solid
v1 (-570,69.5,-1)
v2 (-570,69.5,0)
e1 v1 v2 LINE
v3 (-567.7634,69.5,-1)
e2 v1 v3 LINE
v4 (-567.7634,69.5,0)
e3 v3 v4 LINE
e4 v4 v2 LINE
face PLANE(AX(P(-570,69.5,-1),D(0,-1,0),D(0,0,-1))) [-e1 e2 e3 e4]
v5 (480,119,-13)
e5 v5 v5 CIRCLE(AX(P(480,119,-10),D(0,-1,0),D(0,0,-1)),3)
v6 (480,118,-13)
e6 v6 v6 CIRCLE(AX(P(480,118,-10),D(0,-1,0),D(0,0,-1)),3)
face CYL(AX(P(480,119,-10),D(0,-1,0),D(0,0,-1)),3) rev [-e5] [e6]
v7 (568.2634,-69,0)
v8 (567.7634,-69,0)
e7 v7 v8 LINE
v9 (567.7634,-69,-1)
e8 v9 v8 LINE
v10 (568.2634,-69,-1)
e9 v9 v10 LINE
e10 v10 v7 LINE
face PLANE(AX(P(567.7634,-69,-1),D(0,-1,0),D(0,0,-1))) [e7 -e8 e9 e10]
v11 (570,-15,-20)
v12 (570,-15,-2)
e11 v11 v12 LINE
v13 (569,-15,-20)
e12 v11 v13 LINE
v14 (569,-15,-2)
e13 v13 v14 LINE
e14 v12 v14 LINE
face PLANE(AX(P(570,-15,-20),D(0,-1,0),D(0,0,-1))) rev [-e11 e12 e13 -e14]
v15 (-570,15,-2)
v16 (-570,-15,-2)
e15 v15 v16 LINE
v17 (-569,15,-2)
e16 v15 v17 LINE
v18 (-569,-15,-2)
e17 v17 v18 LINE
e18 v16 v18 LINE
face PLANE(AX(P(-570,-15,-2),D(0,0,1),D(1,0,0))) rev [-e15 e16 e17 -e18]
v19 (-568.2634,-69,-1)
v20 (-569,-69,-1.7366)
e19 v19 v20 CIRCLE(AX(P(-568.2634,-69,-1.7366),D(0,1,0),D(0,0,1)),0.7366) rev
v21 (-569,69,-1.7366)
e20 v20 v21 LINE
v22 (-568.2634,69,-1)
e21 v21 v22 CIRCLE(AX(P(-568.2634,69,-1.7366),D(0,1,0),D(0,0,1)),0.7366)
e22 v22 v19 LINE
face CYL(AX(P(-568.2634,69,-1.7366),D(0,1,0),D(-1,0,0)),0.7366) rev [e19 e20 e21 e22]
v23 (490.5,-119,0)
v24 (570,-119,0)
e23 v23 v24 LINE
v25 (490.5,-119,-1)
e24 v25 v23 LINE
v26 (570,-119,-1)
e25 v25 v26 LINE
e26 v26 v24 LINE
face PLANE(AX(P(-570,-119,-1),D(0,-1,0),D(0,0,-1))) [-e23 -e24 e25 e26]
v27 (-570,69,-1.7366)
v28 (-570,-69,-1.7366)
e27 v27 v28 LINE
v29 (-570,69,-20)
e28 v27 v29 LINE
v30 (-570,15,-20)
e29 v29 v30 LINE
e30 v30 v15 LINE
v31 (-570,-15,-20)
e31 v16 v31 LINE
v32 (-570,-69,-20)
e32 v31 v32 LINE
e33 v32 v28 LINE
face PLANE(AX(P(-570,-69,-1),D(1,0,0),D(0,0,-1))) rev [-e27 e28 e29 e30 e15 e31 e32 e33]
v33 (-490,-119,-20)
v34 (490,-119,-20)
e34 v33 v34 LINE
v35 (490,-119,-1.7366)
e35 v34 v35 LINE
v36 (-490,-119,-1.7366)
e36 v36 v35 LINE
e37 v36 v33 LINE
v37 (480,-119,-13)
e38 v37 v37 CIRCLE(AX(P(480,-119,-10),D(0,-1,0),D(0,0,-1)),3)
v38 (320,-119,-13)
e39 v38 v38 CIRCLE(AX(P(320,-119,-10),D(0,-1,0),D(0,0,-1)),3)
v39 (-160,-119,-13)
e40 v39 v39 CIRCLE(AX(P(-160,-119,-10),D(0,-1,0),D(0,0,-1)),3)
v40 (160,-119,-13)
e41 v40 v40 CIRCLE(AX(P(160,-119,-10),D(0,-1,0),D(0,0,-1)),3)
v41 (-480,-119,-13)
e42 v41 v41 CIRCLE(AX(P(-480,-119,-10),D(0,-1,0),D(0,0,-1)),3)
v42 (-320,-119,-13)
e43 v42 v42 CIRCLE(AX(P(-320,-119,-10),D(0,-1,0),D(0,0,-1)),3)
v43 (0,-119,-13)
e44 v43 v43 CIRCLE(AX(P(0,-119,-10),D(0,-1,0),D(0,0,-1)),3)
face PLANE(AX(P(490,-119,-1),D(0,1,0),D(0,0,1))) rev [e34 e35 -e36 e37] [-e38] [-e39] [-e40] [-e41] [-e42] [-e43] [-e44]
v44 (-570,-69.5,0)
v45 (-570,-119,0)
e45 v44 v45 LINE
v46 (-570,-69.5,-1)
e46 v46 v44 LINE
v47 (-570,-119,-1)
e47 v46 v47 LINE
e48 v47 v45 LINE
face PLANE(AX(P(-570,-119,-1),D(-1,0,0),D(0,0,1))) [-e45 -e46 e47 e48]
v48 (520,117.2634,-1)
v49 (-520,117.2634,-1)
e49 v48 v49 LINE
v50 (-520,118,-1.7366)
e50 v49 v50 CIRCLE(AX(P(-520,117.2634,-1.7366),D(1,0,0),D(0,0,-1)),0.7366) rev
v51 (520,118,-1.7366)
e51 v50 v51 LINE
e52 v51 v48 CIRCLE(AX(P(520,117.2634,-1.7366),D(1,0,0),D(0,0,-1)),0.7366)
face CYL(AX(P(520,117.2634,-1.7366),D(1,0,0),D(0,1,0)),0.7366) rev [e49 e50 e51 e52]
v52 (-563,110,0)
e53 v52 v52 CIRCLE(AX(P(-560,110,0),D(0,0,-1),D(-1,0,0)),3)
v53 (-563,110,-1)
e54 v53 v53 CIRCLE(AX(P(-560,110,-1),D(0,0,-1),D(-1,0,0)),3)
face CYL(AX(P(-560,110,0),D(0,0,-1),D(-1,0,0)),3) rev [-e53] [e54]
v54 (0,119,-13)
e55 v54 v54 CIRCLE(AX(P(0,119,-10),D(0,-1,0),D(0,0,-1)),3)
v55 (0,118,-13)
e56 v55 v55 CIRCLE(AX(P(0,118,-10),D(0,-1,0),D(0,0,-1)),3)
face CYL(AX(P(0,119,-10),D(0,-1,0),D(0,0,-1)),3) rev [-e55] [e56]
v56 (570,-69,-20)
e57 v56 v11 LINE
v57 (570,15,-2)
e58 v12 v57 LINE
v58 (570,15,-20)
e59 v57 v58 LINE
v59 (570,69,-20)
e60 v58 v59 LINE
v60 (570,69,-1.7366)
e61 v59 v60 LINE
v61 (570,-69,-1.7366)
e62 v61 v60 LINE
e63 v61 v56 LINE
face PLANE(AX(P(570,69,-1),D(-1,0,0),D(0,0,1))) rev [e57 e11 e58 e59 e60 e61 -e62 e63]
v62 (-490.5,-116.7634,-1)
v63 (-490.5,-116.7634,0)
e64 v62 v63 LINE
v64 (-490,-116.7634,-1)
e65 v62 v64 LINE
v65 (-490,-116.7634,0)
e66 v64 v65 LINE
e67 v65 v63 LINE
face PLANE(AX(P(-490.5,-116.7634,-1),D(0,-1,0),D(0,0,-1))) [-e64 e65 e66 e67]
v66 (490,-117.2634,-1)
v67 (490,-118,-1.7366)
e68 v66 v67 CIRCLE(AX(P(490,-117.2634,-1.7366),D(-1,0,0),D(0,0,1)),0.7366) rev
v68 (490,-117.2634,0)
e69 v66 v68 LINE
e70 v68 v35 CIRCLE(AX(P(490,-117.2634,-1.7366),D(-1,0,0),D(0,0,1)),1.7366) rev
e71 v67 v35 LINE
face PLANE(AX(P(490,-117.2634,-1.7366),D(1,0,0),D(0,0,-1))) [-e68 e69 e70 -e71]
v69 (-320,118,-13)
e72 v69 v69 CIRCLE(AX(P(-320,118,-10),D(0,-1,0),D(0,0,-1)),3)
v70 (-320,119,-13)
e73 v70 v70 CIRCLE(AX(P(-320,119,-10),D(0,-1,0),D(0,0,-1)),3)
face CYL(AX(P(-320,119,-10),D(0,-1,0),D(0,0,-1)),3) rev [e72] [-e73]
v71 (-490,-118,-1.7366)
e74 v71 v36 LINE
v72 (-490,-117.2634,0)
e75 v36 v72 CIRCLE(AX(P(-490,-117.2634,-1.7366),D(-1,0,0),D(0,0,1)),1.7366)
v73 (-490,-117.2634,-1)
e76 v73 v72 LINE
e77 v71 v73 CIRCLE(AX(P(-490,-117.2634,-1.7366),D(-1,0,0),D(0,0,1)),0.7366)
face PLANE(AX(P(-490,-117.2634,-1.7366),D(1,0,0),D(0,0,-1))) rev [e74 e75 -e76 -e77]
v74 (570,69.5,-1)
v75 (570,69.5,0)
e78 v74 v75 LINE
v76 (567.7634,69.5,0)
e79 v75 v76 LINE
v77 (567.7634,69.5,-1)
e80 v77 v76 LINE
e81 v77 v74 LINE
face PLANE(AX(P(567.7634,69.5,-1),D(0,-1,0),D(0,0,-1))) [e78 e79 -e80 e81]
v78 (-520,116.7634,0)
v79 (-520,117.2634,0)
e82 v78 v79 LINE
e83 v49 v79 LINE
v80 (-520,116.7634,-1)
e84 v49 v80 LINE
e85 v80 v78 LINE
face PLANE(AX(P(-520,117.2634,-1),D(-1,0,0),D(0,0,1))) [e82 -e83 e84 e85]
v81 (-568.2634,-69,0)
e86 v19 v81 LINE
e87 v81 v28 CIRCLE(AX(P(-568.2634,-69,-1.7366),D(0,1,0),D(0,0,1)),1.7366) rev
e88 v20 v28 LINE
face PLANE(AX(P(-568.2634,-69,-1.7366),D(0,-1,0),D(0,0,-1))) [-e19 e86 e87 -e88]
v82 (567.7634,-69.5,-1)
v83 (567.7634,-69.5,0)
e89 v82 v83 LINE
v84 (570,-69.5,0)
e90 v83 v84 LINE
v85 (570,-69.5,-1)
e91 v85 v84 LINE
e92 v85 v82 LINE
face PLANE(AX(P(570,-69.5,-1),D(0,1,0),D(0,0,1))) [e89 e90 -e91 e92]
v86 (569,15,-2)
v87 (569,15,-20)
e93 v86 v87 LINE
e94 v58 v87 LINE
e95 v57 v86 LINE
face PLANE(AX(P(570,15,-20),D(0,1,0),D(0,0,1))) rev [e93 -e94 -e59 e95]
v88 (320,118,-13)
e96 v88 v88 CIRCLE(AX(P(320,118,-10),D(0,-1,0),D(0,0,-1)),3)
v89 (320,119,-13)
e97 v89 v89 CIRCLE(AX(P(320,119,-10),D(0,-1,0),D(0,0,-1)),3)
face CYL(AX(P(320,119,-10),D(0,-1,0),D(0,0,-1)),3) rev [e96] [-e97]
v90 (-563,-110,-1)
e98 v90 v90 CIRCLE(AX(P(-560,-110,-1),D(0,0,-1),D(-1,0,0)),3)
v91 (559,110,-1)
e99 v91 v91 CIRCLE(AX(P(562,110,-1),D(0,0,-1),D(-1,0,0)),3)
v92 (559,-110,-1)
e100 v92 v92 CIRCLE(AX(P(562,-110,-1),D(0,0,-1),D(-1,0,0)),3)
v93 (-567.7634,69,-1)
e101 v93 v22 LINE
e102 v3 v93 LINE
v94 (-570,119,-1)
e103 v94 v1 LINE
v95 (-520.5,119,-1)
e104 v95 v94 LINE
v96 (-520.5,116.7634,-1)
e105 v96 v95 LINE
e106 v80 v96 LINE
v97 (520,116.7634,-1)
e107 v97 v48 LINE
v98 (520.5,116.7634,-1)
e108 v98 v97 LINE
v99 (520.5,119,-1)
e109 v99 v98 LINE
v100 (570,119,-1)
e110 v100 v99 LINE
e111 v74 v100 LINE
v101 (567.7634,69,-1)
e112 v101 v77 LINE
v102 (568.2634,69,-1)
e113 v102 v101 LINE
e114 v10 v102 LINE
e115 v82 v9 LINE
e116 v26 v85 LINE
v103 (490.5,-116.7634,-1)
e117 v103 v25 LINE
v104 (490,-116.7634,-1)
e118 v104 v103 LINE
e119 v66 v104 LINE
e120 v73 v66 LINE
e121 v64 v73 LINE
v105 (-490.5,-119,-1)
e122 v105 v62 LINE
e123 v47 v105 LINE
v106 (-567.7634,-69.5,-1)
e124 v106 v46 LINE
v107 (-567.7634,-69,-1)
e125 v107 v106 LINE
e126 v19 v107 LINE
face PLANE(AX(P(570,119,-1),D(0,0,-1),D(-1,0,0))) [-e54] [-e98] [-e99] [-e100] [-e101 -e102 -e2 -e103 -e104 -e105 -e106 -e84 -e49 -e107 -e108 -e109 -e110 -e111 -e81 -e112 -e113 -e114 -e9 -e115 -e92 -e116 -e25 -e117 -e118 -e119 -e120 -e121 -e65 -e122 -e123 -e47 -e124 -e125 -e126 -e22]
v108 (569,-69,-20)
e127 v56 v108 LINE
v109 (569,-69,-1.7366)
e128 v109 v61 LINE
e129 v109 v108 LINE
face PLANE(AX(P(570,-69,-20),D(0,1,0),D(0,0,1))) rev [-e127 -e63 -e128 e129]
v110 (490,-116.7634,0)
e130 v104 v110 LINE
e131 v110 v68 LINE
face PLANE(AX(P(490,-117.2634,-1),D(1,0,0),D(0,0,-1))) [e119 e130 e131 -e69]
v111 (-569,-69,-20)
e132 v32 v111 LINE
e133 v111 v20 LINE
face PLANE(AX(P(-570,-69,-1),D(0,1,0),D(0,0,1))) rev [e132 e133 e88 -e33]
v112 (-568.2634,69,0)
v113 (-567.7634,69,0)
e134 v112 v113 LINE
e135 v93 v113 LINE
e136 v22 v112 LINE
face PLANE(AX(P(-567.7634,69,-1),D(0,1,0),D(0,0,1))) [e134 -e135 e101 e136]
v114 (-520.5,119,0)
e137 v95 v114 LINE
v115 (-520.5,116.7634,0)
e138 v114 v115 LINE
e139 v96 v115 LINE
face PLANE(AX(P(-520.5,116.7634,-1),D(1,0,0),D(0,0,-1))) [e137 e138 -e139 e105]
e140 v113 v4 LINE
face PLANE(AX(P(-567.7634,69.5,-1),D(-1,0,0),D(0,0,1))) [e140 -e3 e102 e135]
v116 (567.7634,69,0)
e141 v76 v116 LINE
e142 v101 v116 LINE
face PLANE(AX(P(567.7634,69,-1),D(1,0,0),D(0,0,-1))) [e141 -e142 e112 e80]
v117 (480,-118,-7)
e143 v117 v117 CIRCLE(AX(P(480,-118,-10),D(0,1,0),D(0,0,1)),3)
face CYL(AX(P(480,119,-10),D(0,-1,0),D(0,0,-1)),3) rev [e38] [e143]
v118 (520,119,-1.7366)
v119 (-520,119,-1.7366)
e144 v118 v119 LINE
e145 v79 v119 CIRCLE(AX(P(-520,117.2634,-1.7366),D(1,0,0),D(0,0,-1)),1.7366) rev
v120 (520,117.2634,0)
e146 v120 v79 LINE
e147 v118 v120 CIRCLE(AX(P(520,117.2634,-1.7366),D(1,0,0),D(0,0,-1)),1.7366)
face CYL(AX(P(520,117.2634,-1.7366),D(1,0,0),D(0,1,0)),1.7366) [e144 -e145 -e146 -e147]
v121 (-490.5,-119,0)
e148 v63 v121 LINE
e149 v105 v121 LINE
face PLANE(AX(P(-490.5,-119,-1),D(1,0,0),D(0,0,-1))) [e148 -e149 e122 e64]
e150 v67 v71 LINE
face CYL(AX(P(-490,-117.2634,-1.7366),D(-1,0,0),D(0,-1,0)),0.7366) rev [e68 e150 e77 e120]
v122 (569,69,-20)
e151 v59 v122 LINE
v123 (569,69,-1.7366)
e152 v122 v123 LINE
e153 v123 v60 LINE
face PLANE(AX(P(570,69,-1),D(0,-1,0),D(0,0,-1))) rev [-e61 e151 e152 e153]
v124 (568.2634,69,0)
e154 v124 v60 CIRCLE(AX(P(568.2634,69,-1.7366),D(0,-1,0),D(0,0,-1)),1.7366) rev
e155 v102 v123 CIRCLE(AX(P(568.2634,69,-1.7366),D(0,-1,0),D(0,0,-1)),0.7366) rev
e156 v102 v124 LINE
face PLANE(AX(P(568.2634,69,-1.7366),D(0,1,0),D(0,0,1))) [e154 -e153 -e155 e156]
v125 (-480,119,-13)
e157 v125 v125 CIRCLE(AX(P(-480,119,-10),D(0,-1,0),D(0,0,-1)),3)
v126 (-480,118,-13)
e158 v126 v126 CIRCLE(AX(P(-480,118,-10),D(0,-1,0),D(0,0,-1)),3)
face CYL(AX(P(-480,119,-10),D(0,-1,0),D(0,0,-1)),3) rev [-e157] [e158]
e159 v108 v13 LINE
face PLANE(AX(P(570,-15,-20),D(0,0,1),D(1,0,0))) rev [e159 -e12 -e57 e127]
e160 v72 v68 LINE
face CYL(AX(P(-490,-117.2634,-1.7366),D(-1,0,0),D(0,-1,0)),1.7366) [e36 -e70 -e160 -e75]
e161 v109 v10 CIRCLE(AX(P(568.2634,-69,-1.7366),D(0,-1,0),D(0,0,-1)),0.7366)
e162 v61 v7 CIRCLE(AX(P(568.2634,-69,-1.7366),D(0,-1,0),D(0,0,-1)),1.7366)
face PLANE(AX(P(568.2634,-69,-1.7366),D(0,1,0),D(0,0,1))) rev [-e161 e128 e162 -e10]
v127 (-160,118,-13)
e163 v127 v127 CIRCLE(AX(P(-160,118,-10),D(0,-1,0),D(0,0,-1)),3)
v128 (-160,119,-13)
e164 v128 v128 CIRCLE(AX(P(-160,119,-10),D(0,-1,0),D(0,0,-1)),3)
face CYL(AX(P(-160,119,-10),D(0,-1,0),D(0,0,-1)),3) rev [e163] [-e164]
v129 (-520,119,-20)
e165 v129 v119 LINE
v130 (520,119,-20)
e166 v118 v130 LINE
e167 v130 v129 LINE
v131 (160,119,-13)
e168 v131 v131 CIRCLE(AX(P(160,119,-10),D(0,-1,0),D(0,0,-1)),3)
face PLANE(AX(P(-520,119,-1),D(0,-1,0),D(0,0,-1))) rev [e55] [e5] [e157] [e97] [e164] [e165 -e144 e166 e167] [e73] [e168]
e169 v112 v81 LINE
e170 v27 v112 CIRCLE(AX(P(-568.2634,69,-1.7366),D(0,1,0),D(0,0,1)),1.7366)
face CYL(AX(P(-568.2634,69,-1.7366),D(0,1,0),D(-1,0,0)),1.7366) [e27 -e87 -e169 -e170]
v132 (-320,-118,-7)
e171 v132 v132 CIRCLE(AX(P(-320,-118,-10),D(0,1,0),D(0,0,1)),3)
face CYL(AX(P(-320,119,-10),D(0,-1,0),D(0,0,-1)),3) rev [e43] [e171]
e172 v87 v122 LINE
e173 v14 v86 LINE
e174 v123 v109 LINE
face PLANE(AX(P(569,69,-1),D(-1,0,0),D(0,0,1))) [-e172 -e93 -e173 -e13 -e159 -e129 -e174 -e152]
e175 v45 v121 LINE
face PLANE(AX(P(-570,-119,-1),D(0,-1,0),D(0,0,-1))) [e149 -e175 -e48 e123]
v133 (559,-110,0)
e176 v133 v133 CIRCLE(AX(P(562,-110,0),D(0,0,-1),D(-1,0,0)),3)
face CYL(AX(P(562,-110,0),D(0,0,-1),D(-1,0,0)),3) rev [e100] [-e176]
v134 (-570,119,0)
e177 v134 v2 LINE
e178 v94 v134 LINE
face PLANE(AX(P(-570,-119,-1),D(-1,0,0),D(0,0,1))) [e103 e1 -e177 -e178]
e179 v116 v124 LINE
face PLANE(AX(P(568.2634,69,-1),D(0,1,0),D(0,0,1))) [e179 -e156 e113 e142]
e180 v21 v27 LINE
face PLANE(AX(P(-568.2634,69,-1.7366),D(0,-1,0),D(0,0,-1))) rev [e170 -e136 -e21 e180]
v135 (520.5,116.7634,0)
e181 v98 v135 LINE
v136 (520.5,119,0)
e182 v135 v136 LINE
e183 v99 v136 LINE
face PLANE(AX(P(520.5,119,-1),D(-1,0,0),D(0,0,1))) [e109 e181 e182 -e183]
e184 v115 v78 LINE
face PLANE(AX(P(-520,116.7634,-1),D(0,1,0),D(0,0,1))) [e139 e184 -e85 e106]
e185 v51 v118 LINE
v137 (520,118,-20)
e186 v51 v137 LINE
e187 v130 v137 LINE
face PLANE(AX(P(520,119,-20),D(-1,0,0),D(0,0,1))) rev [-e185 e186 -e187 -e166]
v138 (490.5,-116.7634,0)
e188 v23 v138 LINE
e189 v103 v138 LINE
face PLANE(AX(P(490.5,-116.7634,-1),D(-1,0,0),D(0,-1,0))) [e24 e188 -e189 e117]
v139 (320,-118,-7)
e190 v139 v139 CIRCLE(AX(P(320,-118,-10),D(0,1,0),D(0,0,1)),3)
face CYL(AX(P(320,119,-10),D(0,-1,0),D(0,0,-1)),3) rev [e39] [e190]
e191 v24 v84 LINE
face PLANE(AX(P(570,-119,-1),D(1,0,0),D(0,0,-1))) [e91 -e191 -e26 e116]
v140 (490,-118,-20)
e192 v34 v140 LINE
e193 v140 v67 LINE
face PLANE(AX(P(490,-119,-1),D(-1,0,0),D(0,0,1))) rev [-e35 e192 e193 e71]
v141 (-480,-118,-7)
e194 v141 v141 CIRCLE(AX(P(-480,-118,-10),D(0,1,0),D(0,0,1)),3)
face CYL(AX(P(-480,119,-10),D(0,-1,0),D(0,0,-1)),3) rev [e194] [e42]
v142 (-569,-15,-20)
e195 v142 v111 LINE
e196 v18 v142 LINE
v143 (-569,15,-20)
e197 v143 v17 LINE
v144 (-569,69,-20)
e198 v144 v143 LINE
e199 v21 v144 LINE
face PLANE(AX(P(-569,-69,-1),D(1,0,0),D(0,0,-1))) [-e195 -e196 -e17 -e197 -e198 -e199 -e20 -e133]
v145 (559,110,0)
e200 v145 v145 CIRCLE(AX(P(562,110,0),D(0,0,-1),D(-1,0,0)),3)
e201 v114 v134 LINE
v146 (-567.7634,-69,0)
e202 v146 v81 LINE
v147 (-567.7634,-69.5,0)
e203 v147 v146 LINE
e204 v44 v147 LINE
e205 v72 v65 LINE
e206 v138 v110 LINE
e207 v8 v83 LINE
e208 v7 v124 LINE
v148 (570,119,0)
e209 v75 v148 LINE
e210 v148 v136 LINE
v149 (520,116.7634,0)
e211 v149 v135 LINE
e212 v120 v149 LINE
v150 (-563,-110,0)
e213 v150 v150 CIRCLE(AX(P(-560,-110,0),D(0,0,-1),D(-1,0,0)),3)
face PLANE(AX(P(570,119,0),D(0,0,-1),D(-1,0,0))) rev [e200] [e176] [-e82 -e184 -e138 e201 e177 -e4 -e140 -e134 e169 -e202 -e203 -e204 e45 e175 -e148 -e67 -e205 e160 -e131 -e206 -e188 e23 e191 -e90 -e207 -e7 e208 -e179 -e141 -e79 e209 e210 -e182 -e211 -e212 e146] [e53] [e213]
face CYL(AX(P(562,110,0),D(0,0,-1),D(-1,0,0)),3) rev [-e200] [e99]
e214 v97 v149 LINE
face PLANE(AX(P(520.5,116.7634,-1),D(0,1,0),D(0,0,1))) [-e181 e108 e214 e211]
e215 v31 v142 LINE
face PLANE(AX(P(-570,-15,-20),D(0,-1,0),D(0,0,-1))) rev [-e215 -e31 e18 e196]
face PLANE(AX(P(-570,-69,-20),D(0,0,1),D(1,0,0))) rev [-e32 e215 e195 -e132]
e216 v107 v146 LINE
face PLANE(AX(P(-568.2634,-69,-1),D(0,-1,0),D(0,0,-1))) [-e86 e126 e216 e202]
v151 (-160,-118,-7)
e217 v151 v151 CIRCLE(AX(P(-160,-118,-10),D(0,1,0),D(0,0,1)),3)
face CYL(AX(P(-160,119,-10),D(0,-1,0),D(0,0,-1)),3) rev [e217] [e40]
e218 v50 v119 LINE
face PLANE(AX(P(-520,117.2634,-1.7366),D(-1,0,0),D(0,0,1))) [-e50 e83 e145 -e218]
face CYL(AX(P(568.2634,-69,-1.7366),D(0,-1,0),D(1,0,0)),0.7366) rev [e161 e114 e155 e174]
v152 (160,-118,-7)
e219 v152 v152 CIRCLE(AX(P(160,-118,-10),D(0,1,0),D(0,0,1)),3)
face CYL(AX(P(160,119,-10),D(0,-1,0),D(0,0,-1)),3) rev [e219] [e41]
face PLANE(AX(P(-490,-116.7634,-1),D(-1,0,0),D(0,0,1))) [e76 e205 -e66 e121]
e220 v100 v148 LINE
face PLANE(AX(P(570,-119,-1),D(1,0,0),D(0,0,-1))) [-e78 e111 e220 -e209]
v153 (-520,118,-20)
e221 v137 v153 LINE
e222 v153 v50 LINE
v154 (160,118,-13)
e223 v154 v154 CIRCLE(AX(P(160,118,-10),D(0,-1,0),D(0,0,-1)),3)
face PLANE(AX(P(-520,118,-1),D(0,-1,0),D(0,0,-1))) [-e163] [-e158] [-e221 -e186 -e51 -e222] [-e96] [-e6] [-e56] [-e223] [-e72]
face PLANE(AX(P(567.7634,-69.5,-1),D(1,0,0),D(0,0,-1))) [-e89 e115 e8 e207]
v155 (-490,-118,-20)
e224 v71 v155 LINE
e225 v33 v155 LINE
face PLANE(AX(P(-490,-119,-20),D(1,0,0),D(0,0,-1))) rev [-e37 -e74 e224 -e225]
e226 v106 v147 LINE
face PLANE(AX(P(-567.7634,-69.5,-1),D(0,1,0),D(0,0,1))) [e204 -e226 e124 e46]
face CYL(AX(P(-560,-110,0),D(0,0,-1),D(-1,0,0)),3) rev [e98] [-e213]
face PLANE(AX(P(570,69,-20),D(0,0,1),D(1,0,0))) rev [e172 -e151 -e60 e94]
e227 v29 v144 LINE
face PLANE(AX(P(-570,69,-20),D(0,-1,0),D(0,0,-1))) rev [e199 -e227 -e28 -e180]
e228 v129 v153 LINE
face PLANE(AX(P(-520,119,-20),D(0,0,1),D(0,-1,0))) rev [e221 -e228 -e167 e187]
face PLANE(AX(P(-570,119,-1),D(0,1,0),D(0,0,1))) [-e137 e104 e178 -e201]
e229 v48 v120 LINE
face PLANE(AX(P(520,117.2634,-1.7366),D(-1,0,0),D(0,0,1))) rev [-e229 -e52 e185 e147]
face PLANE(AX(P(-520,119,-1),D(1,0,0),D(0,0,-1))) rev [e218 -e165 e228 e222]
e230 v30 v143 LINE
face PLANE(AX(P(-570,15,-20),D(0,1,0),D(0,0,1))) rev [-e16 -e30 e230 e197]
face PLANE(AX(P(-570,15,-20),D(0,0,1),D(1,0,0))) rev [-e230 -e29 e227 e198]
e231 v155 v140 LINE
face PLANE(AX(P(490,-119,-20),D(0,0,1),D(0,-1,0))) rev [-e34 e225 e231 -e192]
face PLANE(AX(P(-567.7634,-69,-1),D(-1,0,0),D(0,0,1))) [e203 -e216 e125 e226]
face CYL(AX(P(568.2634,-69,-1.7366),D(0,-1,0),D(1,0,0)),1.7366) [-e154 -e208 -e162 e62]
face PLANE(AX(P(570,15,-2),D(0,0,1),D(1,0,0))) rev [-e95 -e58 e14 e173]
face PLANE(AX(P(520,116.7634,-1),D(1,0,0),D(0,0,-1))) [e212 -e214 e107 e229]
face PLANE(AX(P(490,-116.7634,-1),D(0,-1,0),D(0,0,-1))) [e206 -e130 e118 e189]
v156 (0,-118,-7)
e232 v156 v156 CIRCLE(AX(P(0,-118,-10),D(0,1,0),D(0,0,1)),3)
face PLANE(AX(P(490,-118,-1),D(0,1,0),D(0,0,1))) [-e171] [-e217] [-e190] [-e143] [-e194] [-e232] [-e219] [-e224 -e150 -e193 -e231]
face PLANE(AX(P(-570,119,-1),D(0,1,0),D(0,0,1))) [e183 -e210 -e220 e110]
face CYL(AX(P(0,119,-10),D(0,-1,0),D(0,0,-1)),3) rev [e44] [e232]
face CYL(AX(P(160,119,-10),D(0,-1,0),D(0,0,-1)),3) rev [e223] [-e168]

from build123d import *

# Parameters (mm, degrees)
SKETCH_1_W                        = 1140
SKETCH_1_H                        = 238
SM_BASE_FLANGE_1_DEPTH            = 1
SM_EDGE_FLANGE_1_STRIP_W          = 5.4732
SM_EDGE_FLANGE_1_STRIP_H          = 1
SM_EDGE_FLANGE_1_STRIP_CUT_DEPTH  = 138
SM_EDGE_FLANGE_1_RELIEF_W         = 5.9732
SM_EDGE_FLANGE_1_RELIEF_H         = 0.5
SM_EDGE_FLANGE_1_RELIEF_CUT_DEPTH = 1
SM_EDGE_FLANGE_1_DEPTH            = 138
SM_EDGE_FLANGE_1_FLAT_DEPTH       = 1
SM_EDGE_FLANGE_2_STRIP_W          = 5.4732
SM_EDGE_FLANGE_2_STRIP_H          = 1
SM_EDGE_FLANGE_2_STRIP_CUT_DEPTH  = 138
SM_EDGE_FLANGE_2_RELIEF_W         = 5.9732
SM_EDGE_FLANGE_2_RELIEF_H         = 0.5
SM_EDGE_FLANGE_2_RELIEF_CUT_DEPTH = 1
SM_EDGE_FLANGE_2_DEPTH            = 138
SM_EDGE_FLANGE_2_FLAT_DEPTH       = 1
SM_EDGE_FLANGE_3_STRIP_W          = 5.4732
SM_EDGE_FLANGE_3_STRIP_H          = 1
SM_EDGE_FLANGE_3_STRIP_CUT_DEPTH  = 980
SM_EDGE_FLANGE_3_RELIEF_W         = 5.9732
SM_EDGE_FLANGE_3_RELIEF_H         = 0.5
SM_EDGE_FLANGE_3_RELIEF_CUT_DEPTH = 1
SM_EDGE_FLANGE_3_DEPTH            = 980
SM_EDGE_FLANGE_4_STRIP_W          = 5.4732
SM_EDGE_FLANGE_4_STRIP_H          = 1
SM_EDGE_FLANGE_4_STRIP_CUT_DEPTH  = 1040
SM_EDGE_FLANGE_4_RELIEF_W         = 5.9732
SM_EDGE_FLANGE_4_RELIEF_H         = 0.5
SM_EDGE_FLANGE_4_RELIEF_CUT_DEPTH = 1
SM_EDGE_FLANGE_4_DEPTH            = 1040
SKETCH_15_R                       = 3
CUT_EXTRUDE_1_DEPTH               = 619.016181018
SKETCH_18_R                       = 3
CUT_EXTRUDE_2_DEPTH               = 583.599347751


# Sheet-metal steps are written as plain solids
with BuildPart() as part:
    # Sketch 1 → 基体-法兰1 (new body)
    with BuildSketch(Plane.XY):
        Rectangle(SKETCH_1_W, SKETCH_1_H)
    extrude(amount=-SM_BASE_FLANGE_1_DEPTH)

    # 边线-法兰1 strip (across the edge) → 边线-法兰1 strip cut (cut)
    with BuildSketch(Plane(origin=(570, 69, -1), x_dir=(-1, 0, 0), z_dir=(0, -1, 0))):
        with Locations((-1, -0.5)):
            Rectangle(SM_EDGE_FLANGE_1_STRIP_W, SM_EDGE_FLANGE_1_STRIP_H)
    extrude(amount=SM_EDGE_FLANGE_1_STRIP_CUT_DEPTH, mode=Mode.SUBTRACT)

    # 边线-法兰1 relief (on the sheet) → 边线-法兰1 relief cut (cut)
    with BuildSketch(Plane(origin=(568.2634, 69, -1), x_dir=(-1, 0, 0), z_dir=(0, 0, -1))):
        with Locations((-2.4866, 0.25)):
            Rectangle(SM_EDGE_FLANGE_1_RELIEF_W, SM_EDGE_FLANGE_1_RELIEF_H)
        with Locations((-2.4866, -138.25)):
            Rectangle(SM_EDGE_FLANGE_1_RELIEF_W, SM_EDGE_FLANGE_1_RELIEF_H)
    extrude(amount=-SM_EDGE_FLANGE_1_RELIEF_CUT_DEPTH, mode=Mode.SUBTRACT)

    # 边线-法兰1 bend section (across the edge) → 边线-法兰1 (add)
    with BuildSketch(Plane(origin=(570, 69, -1), x_dir=(-1, 0, 0), z_dir=(0, -1, 0))):
        with BuildLine():
            Line((0, 0.7366), (1, 0.7366))
            ThreePointArc((1, 0.7366), (1.215745145, 0.215745145), (1.7366, 0))
            Line((1.7366, 0), (1.7366, -1))
            ThreePointArc((1.7366, -1), (0.508638364, -0.491361636), (0, 0.7366))
        make_face()
    extrude(amount=SM_EDGE_FLANGE_1_DEPTH)

    # 边线-法兰1 profile (on flange) → 边线-法兰1 flat (add)
    with BuildSketch(Plane(origin=(570, 0, -1), x_dir=(0, -1, 0), z_dir=(1, 0, 0))):
        Polygon((-69, 0.7366), (69, 0.7366), (69, 19), (15, 19), (15, 1), (-15, 1), (-15, 19), (-69, 19), align=None)
    extrude(amount=-SM_EDGE_FLANGE_1_FLAT_DEPTH)

    # 边线-法兰2 strip (across the edge) → 边线-法兰2 strip cut (cut)
    with BuildSketch(Plane(origin=(-570, -69, -1), x_dir=(1, 0, 0), z_dir=(0, 1, 0))):
        with Locations((-1, -0.5)):
            Rectangle(SM_EDGE_FLANGE_2_STRIP_W, SM_EDGE_FLANGE_2_STRIP_H)
    extrude(amount=SM_EDGE_FLANGE_2_STRIP_CUT_DEPTH, mode=Mode.SUBTRACT)

    # 边线-法兰2 relief (on the sheet) → 边线-法兰2 relief cut (cut)
    with BuildSketch(Plane(origin=(-568.2634, -69, -1), x_dir=(1, 0, 0), z_dir=(0, 0, -1))):
        with Locations((-2.4866, 0.25)):
            Rectangle(SM_EDGE_FLANGE_2_RELIEF_W, SM_EDGE_FLANGE_2_RELIEF_H)
        with Locations((-2.4866, -138.25)):
            Rectangle(SM_EDGE_FLANGE_2_RELIEF_W, SM_EDGE_FLANGE_2_RELIEF_H)
    extrude(amount=-SM_EDGE_FLANGE_2_RELIEF_CUT_DEPTH, mode=Mode.SUBTRACT)

    # 边线-法兰2 bend section (across the edge) → 边线-法兰2 (add)
    with BuildSketch(Plane(origin=(-570, -69, -1), x_dir=(1, 0, 0), z_dir=(0, 1, 0))):
        with BuildLine():
            Line((0, 0.7366), (1, 0.7366))
            ThreePointArc((1, 0.7366), (1.215745145, 0.215745145), (1.7366, 0))
            Line((1.7366, 0), (1.7366, -1))
            ThreePointArc((1.7366, -1), (0.508638364, -0.491361636), (0, 0.7366))
        make_face()
    extrude(amount=SM_EDGE_FLANGE_2_DEPTH)

    # 边线-法兰2 profile (on flange) → 边线-法兰2 flat (add)
    with BuildSketch(Plane(origin=(-570, 0, -1), x_dir=(0, 1, 0), z_dir=(-1, 0, 0))):
        Polygon((-69, 0.7366), (69, 0.7366), (69, 19), (15, 19), (15, 1), (-15, 1), (-15, 19), (-69, 19), align=None)
    extrude(amount=-SM_EDGE_FLANGE_2_FLAT_DEPTH)

    # 边线-法兰3 strip (across the edge) → 边线-法兰3 strip cut (cut)
    with BuildSketch(Plane(origin=(490, -119, -1), x_dir=(0, 1, 0), z_dir=(-1, 0, 0))):
        with Locations((-1, -0.5)):
            Rectangle(SM_EDGE_FLANGE_3_STRIP_W, SM_EDGE_FLANGE_3_STRIP_H)
    extrude(amount=SM_EDGE_FLANGE_3_STRIP_CUT_DEPTH, mode=Mode.SUBTRACT)

    # 边线-法兰3 relief (on the sheet) → 边线-法兰3 relief cut (cut)
    with BuildSketch(Plane(origin=(490, -117.2634, -1), x_dir=(0, 1, 0), z_dir=(0, 0, -1))):
        with Locations((-2.4866, 0.25)):
            Rectangle(SM_EDGE_FLANGE_3_RELIEF_W, SM_EDGE_FLANGE_3_RELIEF_H)
        with Locations((-2.4866, -980.25)):
            Rectangle(SM_EDGE_FLANGE_3_RELIEF_W, SM_EDGE_FLANGE_3_RELIEF_H)
    extrude(amount=-SM_EDGE_FLANGE_3_RELIEF_CUT_DEPTH, mode=Mode.SUBTRACT)

    # 边线-法兰3 section (across the edge) → 边线-法兰3 (add)
    with BuildSketch(Plane(origin=(490, -119, -1), x_dir=(0, 1, 0), z_dir=(-1, 0, 0))):
        with BuildLine():
            Line((0, 0.7366), (0, 19))
            Line((0, 19), (1, 19))
            Line((1, 19), (1, 0.7366))
            ThreePointArc((1, 0.7366), (1.215745145, 0.215745145), (1.7366, 0))
            Line((1.7366, 0), (1.7366, -1))
            ThreePointArc((1.7366, -1), (0.508638364, -0.491361636), (0, 0.7366))
        make_face()
    extrude(amount=SM_EDGE_FLANGE_3_DEPTH)

    # 边线-法兰4 strip (across the edge) → 边线-法兰4 strip cut (cut)
    with BuildSketch(Plane(origin=(-520, 119, -1), x_dir=(0, -1, 0), z_dir=(1, 0, 0))):
        with Locations((-1, -0.5)):
            Rectangle(SM_EDGE_FLANGE_4_STRIP_W, SM_EDGE_FLANGE_4_STRIP_H)
    extrude(amount=SM_EDGE_FLANGE_4_STRIP_CUT_DEPTH, mode=Mode.SUBTRACT)

    # 边线-法兰4 relief (on the sheet) → 边线-法兰4 relief cut (cut)
    with BuildSketch(Plane(origin=(-520, 117.2634, -1), x_dir=(0, -1, 0), z_dir=(0, 0, -1))):
        with Locations((-2.4866, 0.25)):
            Rectangle(SM_EDGE_FLANGE_4_RELIEF_W, SM_EDGE_FLANGE_4_RELIEF_H)
        with Locations((-2.4866, -1040.25)):
            Rectangle(SM_EDGE_FLANGE_4_RELIEF_W, SM_EDGE_FLANGE_4_RELIEF_H)
    extrude(amount=-SM_EDGE_FLANGE_4_RELIEF_CUT_DEPTH, mode=Mode.SUBTRACT)

    # 边线-法兰4 section (across the edge) → 边线-法兰4 (add)
    with BuildSketch(Plane(origin=(-520, 119, -1), x_dir=(0, -1, 0), z_dir=(1, 0, 0))):
        with BuildLine():
            Line((0, 0.7366), (0, 19))
            Line((0, 19), (1, 19))
            Line((1, 19), (1, 0.7366))
            ThreePointArc((1, 0.7366), (1.215745145, 0.215745145), (1.7366, 0))
            Line((1.7366, 0), (1.7366, -1))
            ThreePointArc((1.7366, -1), (0.508638364, -0.491361636), (0, 0.7366))
        make_face()
    extrude(amount=SM_EDGE_FLANGE_4_DEPTH)

    # 草图15 → 切除-拉伸1 (cut, through all)
    with BuildSketch(Plane.XZ.offset(119)):
        with Locations(Location((-480, -10, 0), (0, 0, 270))):
            Circle(SKETCH_15_R)
        with Locations(Location((-320, -10, 0), (0, 0, 270))):
            Circle(SKETCH_15_R)
        with Locations(Location((-160, -10, 0), (0, 0, 270))):
            Circle(SKETCH_15_R)
        with Locations(Location((0, -10, 0), (0, 0, 270))):
            Circle(SKETCH_15_R)
        with Locations(Location((160, -10, 0), (0, 0, 270))):
            Circle(SKETCH_15_R)
        with Locations(Location((320, -10, 0), (0, 0, 270))):
            Circle(SKETCH_15_R)
        with Locations(Location((480, -10, 0), (0, 0, 270))):
            Circle(SKETCH_15_R)
    extrude(amount=-CUT_EXTRUDE_1_DEPTH, mode=Mode.SUBTRACT)

    # 草图18 → 切除-拉伸2 (cut, through all)
    with BuildSketch(Plane(origin=(0, 0, -1), x_dir=(-1, 0, 0), z_dir=(0, 0, -1))):
        with Locations((-562, -110)):
            Circle(SKETCH_18_R)
        with Locations((-562, 110)):
            Circle(SKETCH_18_R)
        with Locations((560, 110)):
            Circle(SKETCH_18_R)
        with Locations((560, -110)):
            Circle(SKETCH_18_R)
    extrude(amount=-CUT_EXTRUDE_2_DEPTH, mode=Mode.SUBTRACT)


solid = part.part
